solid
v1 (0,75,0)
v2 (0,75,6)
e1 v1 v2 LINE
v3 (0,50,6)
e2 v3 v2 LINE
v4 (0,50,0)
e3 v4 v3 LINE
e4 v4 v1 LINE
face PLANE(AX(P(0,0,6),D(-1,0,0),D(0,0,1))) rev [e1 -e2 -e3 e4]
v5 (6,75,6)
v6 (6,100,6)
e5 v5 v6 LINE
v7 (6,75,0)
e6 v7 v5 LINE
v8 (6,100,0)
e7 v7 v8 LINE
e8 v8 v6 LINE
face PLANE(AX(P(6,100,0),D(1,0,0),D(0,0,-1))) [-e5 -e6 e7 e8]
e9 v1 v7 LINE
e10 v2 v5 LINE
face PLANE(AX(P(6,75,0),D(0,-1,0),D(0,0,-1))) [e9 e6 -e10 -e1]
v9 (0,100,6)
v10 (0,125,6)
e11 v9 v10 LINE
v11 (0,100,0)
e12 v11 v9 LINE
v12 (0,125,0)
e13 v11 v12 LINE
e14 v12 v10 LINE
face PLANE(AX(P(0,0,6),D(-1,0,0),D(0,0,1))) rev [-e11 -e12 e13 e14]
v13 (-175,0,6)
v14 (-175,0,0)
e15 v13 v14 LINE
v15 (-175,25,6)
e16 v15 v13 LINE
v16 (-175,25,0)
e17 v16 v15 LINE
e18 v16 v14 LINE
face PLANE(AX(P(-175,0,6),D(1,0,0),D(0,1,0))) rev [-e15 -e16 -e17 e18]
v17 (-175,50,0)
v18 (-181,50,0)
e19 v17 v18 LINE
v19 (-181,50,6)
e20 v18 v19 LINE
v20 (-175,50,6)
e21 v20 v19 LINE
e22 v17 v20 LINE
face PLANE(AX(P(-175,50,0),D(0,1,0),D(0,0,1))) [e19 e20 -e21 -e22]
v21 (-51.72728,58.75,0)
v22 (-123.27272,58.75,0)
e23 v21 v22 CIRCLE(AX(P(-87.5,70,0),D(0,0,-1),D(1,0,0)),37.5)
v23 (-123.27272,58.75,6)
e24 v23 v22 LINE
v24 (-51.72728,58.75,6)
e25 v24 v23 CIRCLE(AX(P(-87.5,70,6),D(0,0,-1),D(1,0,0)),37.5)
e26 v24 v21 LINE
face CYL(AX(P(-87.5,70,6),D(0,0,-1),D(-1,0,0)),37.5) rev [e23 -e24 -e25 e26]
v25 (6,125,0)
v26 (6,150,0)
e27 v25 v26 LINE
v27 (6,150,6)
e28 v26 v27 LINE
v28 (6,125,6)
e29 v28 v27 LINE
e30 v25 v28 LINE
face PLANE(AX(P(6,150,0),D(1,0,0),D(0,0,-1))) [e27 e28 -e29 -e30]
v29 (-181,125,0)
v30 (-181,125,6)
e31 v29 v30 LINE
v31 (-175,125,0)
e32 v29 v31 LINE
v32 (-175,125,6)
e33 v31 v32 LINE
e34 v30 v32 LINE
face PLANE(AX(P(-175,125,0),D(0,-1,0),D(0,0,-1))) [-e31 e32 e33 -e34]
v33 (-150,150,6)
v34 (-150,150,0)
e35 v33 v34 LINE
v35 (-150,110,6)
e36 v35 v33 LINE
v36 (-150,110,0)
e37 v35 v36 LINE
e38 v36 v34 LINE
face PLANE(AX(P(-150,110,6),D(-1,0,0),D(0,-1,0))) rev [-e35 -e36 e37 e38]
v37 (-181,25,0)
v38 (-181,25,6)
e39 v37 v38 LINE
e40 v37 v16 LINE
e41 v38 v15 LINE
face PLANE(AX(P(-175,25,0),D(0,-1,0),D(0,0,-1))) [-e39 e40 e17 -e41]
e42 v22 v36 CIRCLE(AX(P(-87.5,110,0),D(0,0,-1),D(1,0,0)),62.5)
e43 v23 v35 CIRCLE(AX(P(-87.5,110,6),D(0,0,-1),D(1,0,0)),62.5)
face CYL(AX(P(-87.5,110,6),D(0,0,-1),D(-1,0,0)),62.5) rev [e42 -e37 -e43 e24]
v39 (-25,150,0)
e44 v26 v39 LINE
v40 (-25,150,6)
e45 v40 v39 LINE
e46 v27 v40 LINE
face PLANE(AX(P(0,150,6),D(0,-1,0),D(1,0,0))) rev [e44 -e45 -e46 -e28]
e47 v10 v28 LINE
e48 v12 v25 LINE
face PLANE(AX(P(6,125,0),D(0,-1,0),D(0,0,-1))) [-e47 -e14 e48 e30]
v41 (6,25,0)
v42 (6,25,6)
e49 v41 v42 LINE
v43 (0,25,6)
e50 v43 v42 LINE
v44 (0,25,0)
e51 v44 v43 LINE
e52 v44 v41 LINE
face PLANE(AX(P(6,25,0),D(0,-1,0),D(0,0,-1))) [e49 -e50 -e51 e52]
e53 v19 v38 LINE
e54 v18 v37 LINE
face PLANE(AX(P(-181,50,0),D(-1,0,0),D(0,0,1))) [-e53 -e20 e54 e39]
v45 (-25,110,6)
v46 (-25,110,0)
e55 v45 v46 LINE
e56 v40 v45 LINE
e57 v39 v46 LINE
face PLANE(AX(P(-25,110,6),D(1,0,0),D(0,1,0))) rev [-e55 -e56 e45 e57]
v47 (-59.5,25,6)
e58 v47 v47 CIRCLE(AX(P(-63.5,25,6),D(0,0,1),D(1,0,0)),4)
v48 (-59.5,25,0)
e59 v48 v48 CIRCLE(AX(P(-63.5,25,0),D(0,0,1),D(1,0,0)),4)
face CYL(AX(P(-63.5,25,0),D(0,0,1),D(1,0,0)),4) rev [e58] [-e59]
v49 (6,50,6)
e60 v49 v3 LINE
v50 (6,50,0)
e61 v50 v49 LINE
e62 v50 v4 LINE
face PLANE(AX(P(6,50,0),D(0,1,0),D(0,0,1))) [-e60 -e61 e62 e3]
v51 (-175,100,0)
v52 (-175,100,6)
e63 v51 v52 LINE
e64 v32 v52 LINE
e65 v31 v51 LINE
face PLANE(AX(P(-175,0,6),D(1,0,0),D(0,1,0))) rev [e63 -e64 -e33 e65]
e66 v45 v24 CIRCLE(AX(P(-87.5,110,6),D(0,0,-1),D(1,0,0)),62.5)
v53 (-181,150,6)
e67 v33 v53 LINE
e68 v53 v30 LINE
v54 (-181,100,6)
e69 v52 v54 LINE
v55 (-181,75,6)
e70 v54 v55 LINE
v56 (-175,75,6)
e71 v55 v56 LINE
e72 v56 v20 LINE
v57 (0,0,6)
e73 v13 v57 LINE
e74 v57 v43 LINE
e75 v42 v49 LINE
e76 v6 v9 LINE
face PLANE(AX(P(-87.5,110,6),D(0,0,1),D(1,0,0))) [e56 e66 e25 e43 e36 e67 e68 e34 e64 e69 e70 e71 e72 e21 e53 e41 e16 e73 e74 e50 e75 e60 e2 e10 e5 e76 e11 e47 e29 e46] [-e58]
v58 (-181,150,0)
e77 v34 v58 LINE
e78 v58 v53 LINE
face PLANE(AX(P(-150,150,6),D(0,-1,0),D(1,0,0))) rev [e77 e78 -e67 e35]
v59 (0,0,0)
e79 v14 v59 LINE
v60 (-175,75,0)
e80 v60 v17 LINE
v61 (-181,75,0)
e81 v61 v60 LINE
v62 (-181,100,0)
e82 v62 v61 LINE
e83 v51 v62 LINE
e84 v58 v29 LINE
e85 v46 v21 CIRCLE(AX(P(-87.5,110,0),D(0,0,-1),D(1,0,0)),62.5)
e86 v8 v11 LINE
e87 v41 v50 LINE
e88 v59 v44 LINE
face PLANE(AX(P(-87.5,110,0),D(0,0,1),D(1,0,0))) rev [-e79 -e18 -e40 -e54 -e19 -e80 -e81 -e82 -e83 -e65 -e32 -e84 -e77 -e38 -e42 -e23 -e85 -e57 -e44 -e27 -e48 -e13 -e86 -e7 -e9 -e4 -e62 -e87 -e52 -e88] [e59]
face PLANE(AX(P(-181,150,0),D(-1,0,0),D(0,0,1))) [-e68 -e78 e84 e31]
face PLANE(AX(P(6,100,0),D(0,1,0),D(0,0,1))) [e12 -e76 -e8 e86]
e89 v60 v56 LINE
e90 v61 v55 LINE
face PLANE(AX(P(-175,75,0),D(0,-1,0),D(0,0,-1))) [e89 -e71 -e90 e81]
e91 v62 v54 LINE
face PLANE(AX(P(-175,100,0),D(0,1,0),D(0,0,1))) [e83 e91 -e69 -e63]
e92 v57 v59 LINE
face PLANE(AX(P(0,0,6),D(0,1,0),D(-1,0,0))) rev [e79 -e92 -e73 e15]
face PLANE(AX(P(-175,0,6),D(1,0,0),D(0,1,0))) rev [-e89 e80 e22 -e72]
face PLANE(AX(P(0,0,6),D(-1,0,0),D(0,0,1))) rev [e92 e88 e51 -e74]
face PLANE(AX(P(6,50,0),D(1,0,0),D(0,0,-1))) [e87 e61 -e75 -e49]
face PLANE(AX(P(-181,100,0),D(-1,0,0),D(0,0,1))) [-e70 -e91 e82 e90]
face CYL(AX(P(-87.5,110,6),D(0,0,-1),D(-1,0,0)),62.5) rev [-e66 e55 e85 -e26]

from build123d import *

# Parameters (mm, degrees)
BOSS_EXTRUDE1_DEPTH   = 6
SKETCH2_W             = 6
SKETCH2_H             = 25
BOSS_EXTRUDE2_DEPTH   = 6
LPATTERN1_START       = 25
LPATTERN1_OUTLINE_W   = 6
LPATTERN1_OUTLINE_H   = 6
LPATTERN1_DEPTH       = 25
LPATTERN1_START_2     = 75
LPATTERN1_2_OUTLINE_W = 6
LPATTERN1_2_OUTLINE_H = 6
LPATTERN1_2_DEPTH     = 25
LPATTERN1_START_3     = 125
LPATTERN1_3_OUTLINE_W = 6
LPATTERN1_3_OUTLINE_H = 6
LPATTERN1_3_DEPTH     = 25
SKETCH5_R             = 4
CUT_EXTRUDE1_DEPTH    = 236.153141591


# Read off the part's stored shape, not the designer's step: LPattern1
with BuildPart() as part:
    # Sketch1 → Boss-Extrude1 (new body)
    with BuildSketch(Plane.XY):
        with BuildLine():
            Line((-150, 150), (-175, 150))
            Line((-175, 150), (-175, 0))
            Line((-175, 0), (0, 0))
            Line((0, 0), (0, 150))
            Line((0, 150), (-25, 150))
            Line((-25, 150), (-25, 110))
            ThreePointArc((-25, 110), (-32.083192968, 81.099697262), (-51.727279947, 58.75))
            ThreePointArc((-51.727279947, 58.75), (-87.5, 32.5), (-123.272720053, 58.75))
            ThreePointArc((-123.272720053, 58.75), (-142.916807032, 81.099697262), (-150, 110))
            Line((-150, 110), (-150, 150))
        make_face()
    extrude(amount=BOSS_EXTRUDE1_DEPTH)

    # Sketch2 → Boss-Extrude2 (add)
    with BuildSketch(Plane.XY.offset(6)):
        with Locations((-178, 137.5)):
            Rectangle(SKETCH2_W, SKETCH2_H)
    extrude(amount=-BOSS_EXTRUDE2_DEPTH)

    # LPattern1 outline → LPattern1 (add)
    with BuildSketch(Plane(origin=(0, 0, 0), x_dir=(1, 0, 0), z_dir=(0, 1, 0)).offset(LPATTERN1_START)):
        with Locations((-178, -3)):
            Rectangle(LPATTERN1_OUTLINE_W, LPATTERN1_OUTLINE_H)
        with Locations((3, -3)):
            Rectangle(LPATTERN1_OUTLINE_W, LPATTERN1_OUTLINE_H)
    extrude(amount=LPATTERN1_DEPTH)

    # LPattern1 2 outline → LPattern1 2 (add)
    with BuildSketch(Plane(origin=(0, 0, 0), x_dir=(1, 0, 0), z_dir=(0, 1, 0)).offset(LPATTERN1_START_2)):
        with Locations((-178, -3)):
            Rectangle(LPATTERN1_2_OUTLINE_W, LPATTERN1_2_OUTLINE_H)
        with Locations((3, -3)):
            Rectangle(LPATTERN1_2_OUTLINE_W, LPATTERN1_2_OUTLINE_H)
    extrude(amount=LPATTERN1_2_DEPTH)

    # LPattern1 3 outline → LPattern1 3 (add)
    with BuildSketch(Plane(origin=(0, 0, 0), x_dir=(1, 0, 0), z_dir=(0, 1, 0)).offset(LPATTERN1_START_3)):
        with Locations((3, -3)):
            Rectangle(LPATTERN1_3_OUTLINE_W, LPATTERN1_3_OUTLINE_H)
    extrude(amount=LPATTERN1_3_DEPTH)

    # Sketch5 → Cut-Extrude1 (cut, through all)
    with BuildSketch(Plane.XY.offset(6)):
        with Locations((-63.5, 25)):
            Circle(SKETCH5_R)
    extrude(amount=-CUT_EXTRUDE1_DEPTH, mode=Mode.SUBTRACT)


solid = part.part
